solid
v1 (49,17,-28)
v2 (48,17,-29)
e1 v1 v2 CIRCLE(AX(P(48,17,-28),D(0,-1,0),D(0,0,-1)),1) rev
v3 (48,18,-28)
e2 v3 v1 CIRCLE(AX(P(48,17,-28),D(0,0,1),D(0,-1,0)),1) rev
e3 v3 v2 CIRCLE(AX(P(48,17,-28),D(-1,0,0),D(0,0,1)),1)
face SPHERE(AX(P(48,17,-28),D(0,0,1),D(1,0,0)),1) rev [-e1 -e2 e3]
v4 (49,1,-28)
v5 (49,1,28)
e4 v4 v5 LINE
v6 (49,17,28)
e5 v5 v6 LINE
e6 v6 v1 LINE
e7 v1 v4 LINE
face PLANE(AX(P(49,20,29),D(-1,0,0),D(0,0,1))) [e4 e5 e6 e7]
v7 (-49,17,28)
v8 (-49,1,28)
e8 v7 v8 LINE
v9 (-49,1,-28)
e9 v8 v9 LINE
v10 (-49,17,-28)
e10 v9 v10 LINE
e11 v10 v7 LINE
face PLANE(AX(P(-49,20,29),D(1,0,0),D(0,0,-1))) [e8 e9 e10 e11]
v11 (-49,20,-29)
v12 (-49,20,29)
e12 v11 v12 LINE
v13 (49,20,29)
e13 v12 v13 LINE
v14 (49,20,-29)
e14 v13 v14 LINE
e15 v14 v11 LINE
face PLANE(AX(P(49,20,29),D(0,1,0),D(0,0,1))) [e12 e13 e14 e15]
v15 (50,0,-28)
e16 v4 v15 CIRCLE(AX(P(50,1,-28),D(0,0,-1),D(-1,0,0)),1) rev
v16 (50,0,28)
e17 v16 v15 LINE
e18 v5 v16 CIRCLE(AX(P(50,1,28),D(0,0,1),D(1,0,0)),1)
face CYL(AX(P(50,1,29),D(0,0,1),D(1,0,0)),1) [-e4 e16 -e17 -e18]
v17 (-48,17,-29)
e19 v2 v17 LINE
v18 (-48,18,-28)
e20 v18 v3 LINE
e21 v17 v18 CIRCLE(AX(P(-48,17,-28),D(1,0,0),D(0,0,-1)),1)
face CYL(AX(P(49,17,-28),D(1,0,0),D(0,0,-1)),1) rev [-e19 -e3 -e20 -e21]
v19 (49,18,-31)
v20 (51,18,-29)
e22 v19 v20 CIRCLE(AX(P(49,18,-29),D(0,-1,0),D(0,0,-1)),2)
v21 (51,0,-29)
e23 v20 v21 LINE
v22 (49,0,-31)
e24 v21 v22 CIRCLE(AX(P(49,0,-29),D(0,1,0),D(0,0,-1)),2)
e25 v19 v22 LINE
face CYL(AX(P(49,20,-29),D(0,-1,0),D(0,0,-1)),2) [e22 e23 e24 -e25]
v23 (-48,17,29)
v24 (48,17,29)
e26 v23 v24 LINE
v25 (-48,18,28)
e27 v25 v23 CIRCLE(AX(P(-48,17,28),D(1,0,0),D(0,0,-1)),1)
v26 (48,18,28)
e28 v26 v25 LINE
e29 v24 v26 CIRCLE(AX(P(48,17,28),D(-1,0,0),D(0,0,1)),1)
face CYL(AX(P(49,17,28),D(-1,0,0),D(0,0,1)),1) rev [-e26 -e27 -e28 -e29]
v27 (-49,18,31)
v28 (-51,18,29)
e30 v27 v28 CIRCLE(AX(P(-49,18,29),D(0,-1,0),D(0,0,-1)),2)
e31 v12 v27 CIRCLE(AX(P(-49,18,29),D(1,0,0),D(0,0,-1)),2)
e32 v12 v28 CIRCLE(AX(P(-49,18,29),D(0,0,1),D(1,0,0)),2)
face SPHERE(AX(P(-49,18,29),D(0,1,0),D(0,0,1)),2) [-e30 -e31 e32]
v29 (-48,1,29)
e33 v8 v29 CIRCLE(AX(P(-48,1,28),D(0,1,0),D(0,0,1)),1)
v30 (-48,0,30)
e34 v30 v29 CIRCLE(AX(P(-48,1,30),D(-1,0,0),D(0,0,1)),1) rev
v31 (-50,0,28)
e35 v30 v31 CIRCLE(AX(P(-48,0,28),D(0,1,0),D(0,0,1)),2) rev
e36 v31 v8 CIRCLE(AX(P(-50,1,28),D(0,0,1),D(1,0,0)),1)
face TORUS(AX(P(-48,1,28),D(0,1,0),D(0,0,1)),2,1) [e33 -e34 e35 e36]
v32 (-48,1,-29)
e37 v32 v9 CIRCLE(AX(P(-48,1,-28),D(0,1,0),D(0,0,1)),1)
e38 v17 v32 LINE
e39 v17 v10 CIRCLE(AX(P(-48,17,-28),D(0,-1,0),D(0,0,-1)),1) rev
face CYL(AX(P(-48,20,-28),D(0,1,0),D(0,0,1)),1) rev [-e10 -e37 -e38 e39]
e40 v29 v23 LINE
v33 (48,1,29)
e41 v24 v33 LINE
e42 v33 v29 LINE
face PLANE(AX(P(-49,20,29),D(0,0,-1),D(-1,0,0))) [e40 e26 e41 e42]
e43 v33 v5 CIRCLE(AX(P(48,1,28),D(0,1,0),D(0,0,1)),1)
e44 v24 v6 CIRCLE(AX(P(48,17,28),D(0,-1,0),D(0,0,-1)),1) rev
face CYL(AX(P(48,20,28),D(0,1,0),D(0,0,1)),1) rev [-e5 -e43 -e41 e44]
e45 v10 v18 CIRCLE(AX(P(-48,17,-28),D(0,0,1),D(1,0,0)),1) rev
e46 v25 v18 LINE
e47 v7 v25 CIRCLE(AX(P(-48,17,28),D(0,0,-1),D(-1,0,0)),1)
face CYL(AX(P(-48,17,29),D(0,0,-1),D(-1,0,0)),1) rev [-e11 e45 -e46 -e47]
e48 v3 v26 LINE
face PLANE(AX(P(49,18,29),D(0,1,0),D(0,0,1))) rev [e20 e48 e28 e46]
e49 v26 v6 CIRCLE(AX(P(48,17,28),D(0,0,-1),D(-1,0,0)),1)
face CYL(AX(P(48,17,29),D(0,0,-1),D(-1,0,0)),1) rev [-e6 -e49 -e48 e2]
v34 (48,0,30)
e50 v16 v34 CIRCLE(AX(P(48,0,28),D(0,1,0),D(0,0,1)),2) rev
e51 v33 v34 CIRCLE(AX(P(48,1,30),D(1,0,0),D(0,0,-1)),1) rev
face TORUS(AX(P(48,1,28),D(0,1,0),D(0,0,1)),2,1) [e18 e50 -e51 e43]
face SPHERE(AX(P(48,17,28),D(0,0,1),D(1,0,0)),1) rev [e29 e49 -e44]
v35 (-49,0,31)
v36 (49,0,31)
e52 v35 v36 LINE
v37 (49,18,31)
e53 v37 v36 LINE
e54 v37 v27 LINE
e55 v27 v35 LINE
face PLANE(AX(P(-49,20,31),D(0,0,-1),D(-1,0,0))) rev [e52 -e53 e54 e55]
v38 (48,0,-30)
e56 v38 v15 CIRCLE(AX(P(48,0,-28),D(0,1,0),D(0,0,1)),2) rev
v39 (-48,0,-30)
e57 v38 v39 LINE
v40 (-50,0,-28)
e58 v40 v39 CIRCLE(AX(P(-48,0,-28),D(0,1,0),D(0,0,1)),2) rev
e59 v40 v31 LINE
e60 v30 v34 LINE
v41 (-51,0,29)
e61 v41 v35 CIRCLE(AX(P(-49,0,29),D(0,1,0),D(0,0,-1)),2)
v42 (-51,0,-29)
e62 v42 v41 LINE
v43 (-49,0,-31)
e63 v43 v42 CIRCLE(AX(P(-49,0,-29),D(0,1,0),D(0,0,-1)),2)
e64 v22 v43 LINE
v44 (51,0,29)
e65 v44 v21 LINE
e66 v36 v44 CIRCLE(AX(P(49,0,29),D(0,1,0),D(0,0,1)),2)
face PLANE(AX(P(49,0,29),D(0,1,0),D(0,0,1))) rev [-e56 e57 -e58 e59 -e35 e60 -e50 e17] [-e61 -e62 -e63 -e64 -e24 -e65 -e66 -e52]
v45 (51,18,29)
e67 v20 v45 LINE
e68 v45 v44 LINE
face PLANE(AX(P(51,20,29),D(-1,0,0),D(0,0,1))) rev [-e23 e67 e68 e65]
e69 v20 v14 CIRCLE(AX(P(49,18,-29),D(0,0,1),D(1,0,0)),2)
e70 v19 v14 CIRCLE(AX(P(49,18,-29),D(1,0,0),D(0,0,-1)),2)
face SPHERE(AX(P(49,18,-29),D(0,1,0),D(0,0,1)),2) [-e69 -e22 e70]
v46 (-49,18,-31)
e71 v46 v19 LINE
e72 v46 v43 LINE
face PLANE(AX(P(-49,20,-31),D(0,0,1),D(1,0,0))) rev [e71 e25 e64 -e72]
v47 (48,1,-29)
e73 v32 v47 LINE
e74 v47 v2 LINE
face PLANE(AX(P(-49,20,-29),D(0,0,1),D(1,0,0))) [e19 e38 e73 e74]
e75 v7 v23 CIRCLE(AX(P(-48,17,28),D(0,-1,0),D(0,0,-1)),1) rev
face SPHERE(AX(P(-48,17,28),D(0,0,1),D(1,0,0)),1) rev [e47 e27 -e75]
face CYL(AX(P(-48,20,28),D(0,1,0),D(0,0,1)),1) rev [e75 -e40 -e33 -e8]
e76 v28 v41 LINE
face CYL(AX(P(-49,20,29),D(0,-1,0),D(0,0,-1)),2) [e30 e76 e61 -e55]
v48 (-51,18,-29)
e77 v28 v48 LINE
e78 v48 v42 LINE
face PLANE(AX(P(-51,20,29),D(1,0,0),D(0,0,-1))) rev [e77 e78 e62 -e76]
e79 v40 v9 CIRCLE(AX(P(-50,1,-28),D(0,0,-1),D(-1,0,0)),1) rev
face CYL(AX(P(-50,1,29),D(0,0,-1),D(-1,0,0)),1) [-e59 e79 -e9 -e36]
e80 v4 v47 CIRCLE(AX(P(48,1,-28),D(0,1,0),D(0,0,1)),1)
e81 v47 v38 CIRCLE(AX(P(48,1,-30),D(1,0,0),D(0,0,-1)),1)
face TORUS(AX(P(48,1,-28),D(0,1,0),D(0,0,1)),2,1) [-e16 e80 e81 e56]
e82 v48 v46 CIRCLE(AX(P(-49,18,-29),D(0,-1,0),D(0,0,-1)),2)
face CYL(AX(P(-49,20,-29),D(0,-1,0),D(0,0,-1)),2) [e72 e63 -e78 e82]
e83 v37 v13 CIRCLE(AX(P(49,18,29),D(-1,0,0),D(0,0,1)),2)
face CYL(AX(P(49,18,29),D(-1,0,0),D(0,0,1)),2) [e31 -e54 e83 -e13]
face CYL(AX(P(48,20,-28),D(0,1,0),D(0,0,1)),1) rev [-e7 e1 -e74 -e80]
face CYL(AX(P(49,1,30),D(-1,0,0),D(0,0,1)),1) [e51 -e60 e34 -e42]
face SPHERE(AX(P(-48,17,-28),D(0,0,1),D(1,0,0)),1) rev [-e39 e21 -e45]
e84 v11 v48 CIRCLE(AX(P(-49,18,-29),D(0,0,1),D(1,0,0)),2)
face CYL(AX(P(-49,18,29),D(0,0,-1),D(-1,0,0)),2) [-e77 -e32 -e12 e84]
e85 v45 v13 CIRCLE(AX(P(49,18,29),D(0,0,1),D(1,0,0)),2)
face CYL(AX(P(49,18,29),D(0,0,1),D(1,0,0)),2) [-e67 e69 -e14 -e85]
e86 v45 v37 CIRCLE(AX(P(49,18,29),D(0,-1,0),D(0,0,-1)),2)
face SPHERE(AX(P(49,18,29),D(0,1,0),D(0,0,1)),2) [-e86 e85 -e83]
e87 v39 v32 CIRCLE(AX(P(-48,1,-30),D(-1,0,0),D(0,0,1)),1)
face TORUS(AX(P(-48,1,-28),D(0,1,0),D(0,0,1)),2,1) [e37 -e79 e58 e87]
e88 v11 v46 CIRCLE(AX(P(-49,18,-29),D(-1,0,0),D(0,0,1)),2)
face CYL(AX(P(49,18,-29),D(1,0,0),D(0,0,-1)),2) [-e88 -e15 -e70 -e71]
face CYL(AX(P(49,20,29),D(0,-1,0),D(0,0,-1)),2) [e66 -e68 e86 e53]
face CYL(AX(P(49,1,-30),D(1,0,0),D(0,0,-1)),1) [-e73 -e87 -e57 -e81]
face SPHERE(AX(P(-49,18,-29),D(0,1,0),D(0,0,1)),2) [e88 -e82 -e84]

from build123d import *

# Parameters (mm, degrees)
BOSS_EXTRUDE1_DEPTH = 20
FILLET1_R           = 2
SHELL1_START        = -49
SHELL1_OUTLINE_W    = 18
SHELL1_OUTLINE_H    = 58
SHELL1_DEPTH        = 98
FILLET2_R           = 1


# Read off the part's stored shape, not the designer's step: Shell1
with BuildPart() as part:
    # Sketch1 → Boss-Extrude1 (new body)
    with BuildSketch(Plane(origin=(0, 0, 0), x_dir=(1, 0, 0), z_dir=(0, 1, 0))):
        with BuildLine():
            Line((-49, -31), (49, -31))
            ThreePointArc((49, -31), (50.414213562, -30.414213562), (51, -29))
            Line((51, -29), (51, 29))
            ThreePointArc((51, 29), (50.414213562, 30.414213562), (49, 31))
            Line((49, 31), (-49, 31))
            ThreePointArc((-49, 31), (-50.414213562, 30.414213562), (-51, 29))
            Line((-51, 29), (-51, -29))
            ThreePointArc((-51, -29), (-50.414213562, -30.414213562), (-49, -31))
        make_face()
    extrude(amount=BOSS_EXTRUDE1_DEPTH)

    # Fillet1
    fillet1_edges = [part.edges().sort_by_distance(p)[0] for p in [
        (50.414213562, 20, -30.414213562),
        (0, 20, -31),
        (-50.414213562, 20, -30.414213562),
        (-51, 20, 0),
        (-50.414213562, 20, 30.414213562),
        (0, 20, 31),
        (50.414213562, 20, 30.414213562),
        (51, 20, 0),
    ]]
    fillet(fillet1_edges, radius=FILLET1_R)

    # Shell1 outline → Shell1 (cut)
    with BuildSketch(Plane.YZ.offset(SHELL1_START)):
        with Locations((9, 0)):
            Rectangle(SHELL1_OUTLINE_W, SHELL1_OUTLINE_H)
    extrude(amount=SHELL1_DEPTH, mode=Mode.SUBTRACT)

    # Fillet2
    fillet2_edges = [part.edges().sort_by_distance(p)[0] for p in [
        (49, 9, 29),
        (49, 0, 0),
        (0, 18, -29),
        (49, 9, -29),
        (0, 0, -29),
        (-49, 18, 0),
        (-49, 9, -29),
        (-49, 0, 0),
        (0, 18, 29),
        (-49, 9, 29),
        (0, 0, 29),
        (49, 18, 0),
    ]]
    fillet(fillet2_edges, radius=FILLET2_R)


solid = part.part
